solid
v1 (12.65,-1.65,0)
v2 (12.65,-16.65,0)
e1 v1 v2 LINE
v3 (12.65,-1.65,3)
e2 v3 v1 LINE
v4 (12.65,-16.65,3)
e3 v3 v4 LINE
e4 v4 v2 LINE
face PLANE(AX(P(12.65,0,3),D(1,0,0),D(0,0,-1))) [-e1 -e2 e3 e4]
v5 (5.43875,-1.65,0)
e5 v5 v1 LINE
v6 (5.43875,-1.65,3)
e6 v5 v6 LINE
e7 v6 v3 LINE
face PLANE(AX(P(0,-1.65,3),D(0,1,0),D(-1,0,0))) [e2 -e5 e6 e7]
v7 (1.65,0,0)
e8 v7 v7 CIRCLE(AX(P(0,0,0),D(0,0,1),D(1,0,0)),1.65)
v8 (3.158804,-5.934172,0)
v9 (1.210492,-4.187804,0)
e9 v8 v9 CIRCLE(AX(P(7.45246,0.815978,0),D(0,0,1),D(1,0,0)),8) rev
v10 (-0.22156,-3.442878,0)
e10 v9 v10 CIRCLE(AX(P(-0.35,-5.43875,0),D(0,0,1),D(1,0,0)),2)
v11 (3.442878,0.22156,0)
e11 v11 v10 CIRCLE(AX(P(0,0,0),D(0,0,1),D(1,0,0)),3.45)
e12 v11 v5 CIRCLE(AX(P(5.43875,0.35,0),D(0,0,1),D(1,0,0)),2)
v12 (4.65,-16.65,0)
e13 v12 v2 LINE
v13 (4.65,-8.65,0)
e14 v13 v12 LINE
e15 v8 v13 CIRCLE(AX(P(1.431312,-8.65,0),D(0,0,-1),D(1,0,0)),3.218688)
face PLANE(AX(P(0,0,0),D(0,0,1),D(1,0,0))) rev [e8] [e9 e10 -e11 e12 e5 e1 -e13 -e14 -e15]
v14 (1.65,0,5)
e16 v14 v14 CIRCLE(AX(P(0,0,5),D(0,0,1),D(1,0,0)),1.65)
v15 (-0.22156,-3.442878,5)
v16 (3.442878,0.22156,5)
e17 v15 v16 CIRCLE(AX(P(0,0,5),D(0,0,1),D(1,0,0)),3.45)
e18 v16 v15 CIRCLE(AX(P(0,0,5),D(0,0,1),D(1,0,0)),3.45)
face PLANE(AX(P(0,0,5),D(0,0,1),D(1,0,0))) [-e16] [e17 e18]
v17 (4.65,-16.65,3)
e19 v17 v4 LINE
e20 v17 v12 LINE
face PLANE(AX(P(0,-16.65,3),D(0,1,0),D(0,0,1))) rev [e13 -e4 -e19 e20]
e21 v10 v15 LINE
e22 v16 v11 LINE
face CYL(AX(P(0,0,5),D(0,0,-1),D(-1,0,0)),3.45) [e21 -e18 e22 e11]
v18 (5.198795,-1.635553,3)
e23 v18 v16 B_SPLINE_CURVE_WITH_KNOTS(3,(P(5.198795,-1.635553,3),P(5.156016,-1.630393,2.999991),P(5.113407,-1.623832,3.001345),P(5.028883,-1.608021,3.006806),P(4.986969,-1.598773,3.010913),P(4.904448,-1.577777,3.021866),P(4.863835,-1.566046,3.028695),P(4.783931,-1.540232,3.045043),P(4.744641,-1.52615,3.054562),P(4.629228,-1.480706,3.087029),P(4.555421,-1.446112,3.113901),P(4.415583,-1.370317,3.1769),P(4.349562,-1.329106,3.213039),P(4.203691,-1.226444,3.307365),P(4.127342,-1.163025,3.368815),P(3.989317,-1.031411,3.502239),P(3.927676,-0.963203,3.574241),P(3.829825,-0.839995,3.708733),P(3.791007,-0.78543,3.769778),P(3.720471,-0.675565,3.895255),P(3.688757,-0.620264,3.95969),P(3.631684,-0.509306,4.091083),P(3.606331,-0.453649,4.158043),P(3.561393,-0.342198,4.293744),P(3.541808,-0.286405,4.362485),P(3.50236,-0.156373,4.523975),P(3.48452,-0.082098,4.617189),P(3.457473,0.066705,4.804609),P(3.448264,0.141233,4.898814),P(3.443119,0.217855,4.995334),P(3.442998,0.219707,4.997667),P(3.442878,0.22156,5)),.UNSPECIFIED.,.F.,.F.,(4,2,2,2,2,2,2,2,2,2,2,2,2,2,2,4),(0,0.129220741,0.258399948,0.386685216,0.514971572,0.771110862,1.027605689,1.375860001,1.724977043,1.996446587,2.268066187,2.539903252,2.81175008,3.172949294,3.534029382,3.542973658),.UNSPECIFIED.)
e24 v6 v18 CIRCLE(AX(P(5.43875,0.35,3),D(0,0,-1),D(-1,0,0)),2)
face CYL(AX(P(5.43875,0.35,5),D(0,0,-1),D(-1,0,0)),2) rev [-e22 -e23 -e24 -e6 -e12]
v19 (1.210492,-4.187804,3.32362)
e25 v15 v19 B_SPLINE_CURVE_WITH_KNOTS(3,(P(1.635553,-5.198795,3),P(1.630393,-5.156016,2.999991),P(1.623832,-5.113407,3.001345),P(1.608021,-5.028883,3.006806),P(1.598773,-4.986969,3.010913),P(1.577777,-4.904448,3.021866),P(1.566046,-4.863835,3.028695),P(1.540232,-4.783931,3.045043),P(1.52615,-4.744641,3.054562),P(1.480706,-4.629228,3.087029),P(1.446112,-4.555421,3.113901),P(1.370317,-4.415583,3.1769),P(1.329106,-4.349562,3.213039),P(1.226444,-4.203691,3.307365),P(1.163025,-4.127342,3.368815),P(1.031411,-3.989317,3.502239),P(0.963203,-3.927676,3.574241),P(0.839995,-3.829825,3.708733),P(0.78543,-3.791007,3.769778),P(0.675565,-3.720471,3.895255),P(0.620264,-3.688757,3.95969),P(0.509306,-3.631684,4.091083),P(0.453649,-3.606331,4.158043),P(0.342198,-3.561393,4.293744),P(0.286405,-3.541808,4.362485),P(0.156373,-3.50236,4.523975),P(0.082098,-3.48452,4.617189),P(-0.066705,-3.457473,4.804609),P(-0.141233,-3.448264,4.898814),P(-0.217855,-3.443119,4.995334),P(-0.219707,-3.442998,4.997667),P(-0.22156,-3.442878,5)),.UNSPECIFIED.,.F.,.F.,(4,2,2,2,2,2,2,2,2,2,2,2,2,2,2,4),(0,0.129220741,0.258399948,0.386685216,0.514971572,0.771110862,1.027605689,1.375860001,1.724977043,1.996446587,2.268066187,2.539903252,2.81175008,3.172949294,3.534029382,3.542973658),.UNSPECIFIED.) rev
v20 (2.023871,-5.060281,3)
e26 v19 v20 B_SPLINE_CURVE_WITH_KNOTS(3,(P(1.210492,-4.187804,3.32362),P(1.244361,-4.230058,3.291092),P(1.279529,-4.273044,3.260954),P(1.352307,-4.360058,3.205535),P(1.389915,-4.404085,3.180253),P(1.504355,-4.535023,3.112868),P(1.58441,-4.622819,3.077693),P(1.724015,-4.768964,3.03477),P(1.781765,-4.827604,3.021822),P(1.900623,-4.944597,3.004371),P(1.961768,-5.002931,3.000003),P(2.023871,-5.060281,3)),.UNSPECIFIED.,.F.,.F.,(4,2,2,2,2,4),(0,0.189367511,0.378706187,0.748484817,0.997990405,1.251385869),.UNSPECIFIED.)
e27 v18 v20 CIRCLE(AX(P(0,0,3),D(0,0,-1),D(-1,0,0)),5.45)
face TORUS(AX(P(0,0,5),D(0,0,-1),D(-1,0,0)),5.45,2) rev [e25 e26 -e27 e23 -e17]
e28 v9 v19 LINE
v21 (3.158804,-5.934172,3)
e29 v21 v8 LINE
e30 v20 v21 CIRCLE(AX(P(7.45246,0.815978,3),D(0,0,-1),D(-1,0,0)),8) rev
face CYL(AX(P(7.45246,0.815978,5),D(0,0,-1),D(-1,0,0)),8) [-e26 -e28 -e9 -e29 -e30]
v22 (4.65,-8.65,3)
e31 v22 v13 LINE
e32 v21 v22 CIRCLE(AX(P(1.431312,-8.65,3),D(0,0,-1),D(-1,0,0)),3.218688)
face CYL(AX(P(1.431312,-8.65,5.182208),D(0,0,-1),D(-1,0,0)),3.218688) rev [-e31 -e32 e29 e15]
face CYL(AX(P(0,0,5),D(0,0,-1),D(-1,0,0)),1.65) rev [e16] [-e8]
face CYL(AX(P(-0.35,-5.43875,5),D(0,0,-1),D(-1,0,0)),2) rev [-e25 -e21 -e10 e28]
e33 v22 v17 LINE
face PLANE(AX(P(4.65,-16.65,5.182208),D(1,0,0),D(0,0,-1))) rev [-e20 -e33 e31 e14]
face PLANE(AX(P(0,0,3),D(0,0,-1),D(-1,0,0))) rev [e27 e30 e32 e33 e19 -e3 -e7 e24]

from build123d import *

# Parameters (mm, degrees)
SKETCH1_R           = 3.45
SKETCH1_R_2         = 1.65
BOSS_EXTRUDE1_DEPTH = 5
SKETCH2_W           = 11
SKETCH2_H           = 15
BOSS_EXTRUDE2_DEPTH = 3
FILLET1_R           = 2
CUT_EXTRUDE1_DEPTH  = 22.499883744
FILLET2_R           = 8


with BuildPart() as part:
    # Sketch1 → Boss-Extrude1 (new body)
    with BuildSketch(Plane.XY):
        Circle(SKETCH1_R)
        Circle(SKETCH1_R_2, mode=Mode.SUBTRACT)
    extrude(amount=BOSS_EXTRUDE1_DEPTH)

    # Sketch2 → Boss-Extrude2 (add)
    with BuildSketch(Plane(origin=(0, 0, 0), x_dir=(-1, 0, 0), z_dir=(0, 0, -1))):
        with Locations((-7.15, -9.15)):
            Rectangle(SKETCH2_W, SKETCH2_H)
    extrude(amount=-BOSS_EXTRUDE2_DEPTH)

    # Fillet1
    # the kernel refuses this fillet: 2 mm, written as the material it adds along each edge
    with BuildSketch(Plane(origin=(0, 0, 3), x_dir=(0.5811301681486029, 0.8138106215008357, 0), z_dir=(-0.8138106215008357, 0.5811301681486029, 0))) as fillet1_piece_1_section:
        with BuildLine():
            CenterArc((3.45 + FILLET1_R, -FILLET1_R), FILLET1_R, 90, 90)
            Line((3.45 + FILLET1_R, 0), (3.45 + FILLET1_R, FILLET1_R * 0.02))
            Line((3.45 + FILLET1_R, FILLET1_R * 0.02), (3.45 - FILLET1_R * 0.02, FILLET1_R * 0.02))
            Line((3.45 - FILLET1_R * 0.02, FILLET1_R * 0.02), (3.45 - FILLET1_R * 0.02, -FILLET1_R))
            Line((3.45 - FILLET1_R * 0.02, -FILLET1_R), (3.45, -FILLET1_R))
        make_face()
    fillet1_piece_1 = revolve(axis=Axis((0, 0, 3), (0, 0, -1)), revolution_arc=198.93985607, mode=Mode.PRIVATE)
    fillet1_piece_1 = split(fillet1_piece_1, bisect_by=Plane(origin=(1.65, -2.775668714, 3.387031985), z_dir=(1, 0, 0)), keep=Keep.TOP, mode=Mode.PRIVATE)
    fillet1_piece_1 = split(fillet1_piece_1, bisect_by=Plane(origin=(2.775669412, -1.65, 3.387031985), z_dir=(0, -1, 0)), keep=Keep.TOP, mode=Mode.PRIVATE)
    add(fillet1_piece_1)
    with BuildSketch(Plane(origin=(1.65, -3.029851482, 3), x_dir=(-0.9765037028672113, -0.21550062247386903, 0), z_dir=(0, 0, -1))) as fillet1_piece_2:
        with BuildLine():
            CenterArc((2.472126505, -1.921296938), FILLET1_R, 106.126978769, 86.317920605)
            Line((0.519119099, -2.352298183), (0.480058951, -2.360918208))
            Line((0.480058951, -2.360918208), (-0.039060148, -0.008620025))
            Line((-0.039060148, -0.008620025), (0.011110681, 0.038425939))
            ThreePointArc((0.011110681, 0.038425939), (0.958296229, -0.095762782), (1.905481778, 0.038425939))
            Line((1.905481778, 0.038425939), (1.916592459, 0))
        make_face()
    extrude(amount=3)
    with BuildSketch(Plane(origin=(3.029851482, -1.65, 3), x_dir=(0.21550062247386917, 0.9765037028672113, 0), z_dir=(0, 0, -1))) as fillet1_piece_3:
        with BuildLine():
            CenterArc((2.472126505, 1.921296938), FILLET1_R, 167.555100626, 86.317920605)
            Line((0.519119099, 2.352298183), (0.480058951, 2.360918208))
            Line((0.480058951, 2.360918208), (-0.039060148, 0.008620025))
            Line((-0.039060148, 0.008620025), (0.011110681, -0.038425939))
            ThreePointArc((0.011110681, -0.038425939), (0.958296229, 0.095762782), (1.905481778, -0.038425939))
            Line((1.905481778, -0.038425939), (1.916592459, 0))
        make_face()
    extrude(amount=3)
    with BuildSketch(Plane(origin=(0, 0, 3), x_dir=(0.5811301681486029, 0.8138106215008357, 0), z_dir=(-0.8138106215008357, 0.5811301681486029, 0))) as fillet1_piece_4a_section:
        with BuildLine():
            CenterArc((3.45 + FILLET1_R, -FILLET1_R), FILLET1_R, 90, 90)
            Line((3.45 + FILLET1_R, 0), (3.45 + FILLET1_R, FILLET1_R * 0.02))
            Line((3.45 + FILLET1_R, FILLET1_R * 0.02), (3.45 - FILLET1_R * 0.02, FILLET1_R * 0.02))
            Line((3.45 - FILLET1_R * 0.02, FILLET1_R * 0.02), (3.45 - FILLET1_R * 0.02, -FILLET1_R))
            Line((3.45 - FILLET1_R * 0.02, -FILLET1_R), (3.45, -FILLET1_R))
        make_face()
    fillet1_piece_4a = revolve(axis=Axis((0, 0, 3), (0, 0, -1)), revolution_arc=198.93985607, mode=Mode.PRIVATE)
    fillet1_piece_4a = split(fillet1_piece_4a, bisect_by=Plane(origin=(3.505644008, -1.65, 3.43409217), z_dir=(0, 1, 0)), keep=Keep.TOP, mode=Mode.PRIVATE)
    with BuildSketch(Plane(origin=(3.029851482, -1.65, 9.022245937), x_dir=(0.21550062247386909, 0.9765037028672113, 0), z_dir=(0, 0, -1))) as fillet1_piece_4b_section:
        with BuildLine():
            CenterArc((2.472126505, 1.921296938), FILLET1_R, 167.555100626, 86.317920605)
            Line((0.519119099, 2.352298183), (0.480058951, 2.360918208))
            Line((0.480058951, 2.360918208), (-0.039060148, 0.008620025))
            Line((-0.039060148, 0.008620025), (0.011110681, -0.038425939))
            ThreePointArc((0.011110681, -0.038425939), (0.958296229, 0.095762782), (1.905481778, -0.038425939))
            Line((1.905481778, -0.038425939), (1.916592459, 0))
        make_face()
    fillet1_piece_4b = extrude(amount=9.022245937, mode=Mode.PRIVATE)
    fillet1_piece_4b = split(fillet1_piece_4b, bisect_by=Plane(origin=(3.781400642, -1.225418489, 3), z_dir=(0, 0, 1)), keep=Keep.TOP, mode=Mode.PRIVATE)
    fillet1_piece_4 = fillet1_piece_4a & fillet1_piece_4b
    add(fillet1_piece_4)
    with BuildSketch(Plane(origin=(1.65, -3.029851482, 9.022245937), x_dir=(-0.9765037028672113, -0.2155006224738689, 0), z_dir=(0, 0, -1))) as fillet1_piece_5a_section:
        with BuildLine():
            CenterArc((2.472126505, -1.921296938), FILLET1_R, 106.126978769, 86.317920605)
            Line((0.519119099, -2.352298183), (0.480058951, -2.360918208))
            Line((0.480058951, -2.360918208), (-0.039060148, -0.008620025))
            Line((-0.039060148, -0.008620025), (0.011110681, 0.038425939))
            ThreePointArc((0.011110681, 0.038425939), (0.958296229, -0.095762782), (1.905481778, 0.038425939))
            Line((1.905481778, 0.038425939), (1.916592459, 0))
        make_face()
    fillet1_piece_5a = extrude(amount=9.022245937, mode=Mode.PRIVATE)
    fillet1_piece_5a = split(fillet1_piece_5a, bisect_by=Plane(origin=(1.225418489, -3.781400642, 3), z_dir=(0, 0, 1)), keep=Keep.TOP, mode=Mode.PRIVATE)
    with BuildSketch(Plane(origin=(0, 0, 3), x_dir=(0.5811301681486029, 0.8138106215008357, 0), z_dir=(-0.8138106215008357, 0.5811301681486029, 0))) as fillet1_piece_5b_section:
        with BuildLine():
            CenterArc((3.45 + FILLET1_R, -FILLET1_R), FILLET1_R, 90, 90)
            Line((3.45 + FILLET1_R, 0), (3.45 + FILLET1_R, FILLET1_R * 0.02))
            Line((3.45 + FILLET1_R, FILLET1_R * 0.02), (3.45 - FILLET1_R * 0.02, FILLET1_R * 0.02))
            Line((3.45 - FILLET1_R * 0.02, FILLET1_R * 0.02), (3.45 - FILLET1_R * 0.02, -FILLET1_R))
            Line((3.45 - FILLET1_R * 0.02, -FILLET1_R), (3.45, -FILLET1_R))
        make_face()
    fillet1_piece_5b = revolve(axis=Axis((0, 0, 3), (0, 0, -1)), revolution_arc=198.93985607, mode=Mode.PRIVATE)
    fillet1_piece_5b = split(fillet1_piece_5b, bisect_by=Plane(origin=(1.65, -3.505643385, 3.43409212), z_dir=(-1, 0, 0)), keep=Keep.TOP, mode=Mode.PRIVATE)
    fillet1_piece_5 = fillet1_piece_5a & fillet1_piece_5b
    add(fillet1_piece_5)

    # Sketch3 → Cut-Extrude1 (cut, through all)
    with BuildSketch(Plane(origin=(0, 0, 0), x_dir=(-1, 0, 0), z_dir=(0, 0, -1))):
        with BuildLine():
            Line((-4.65, -16.65), (-4.65, -8.65))
            ThreePointArc((-4.65, -8.65), (-3.783315491, -6.452721713), (-1.65, -5.438749856))
            Line((-1.65, -5.438749856), (-1.65, -16.65))
            Line((-1.65, -16.65), (-4.65, -16.65))
        make_face()
    extrude(amount=-CUT_EXTRUDE1_DEPTH, mode=Mode.SUBTRACT)

    # Fillet2
    fillet2_edges = [part.edges().sort_by_distance(p)[0] for p in [
        (1.65, -5.438749856, 1.5),
    ]]
    fillet(fillet2_edges, radius=FILLET2_R)


solid = part.part
